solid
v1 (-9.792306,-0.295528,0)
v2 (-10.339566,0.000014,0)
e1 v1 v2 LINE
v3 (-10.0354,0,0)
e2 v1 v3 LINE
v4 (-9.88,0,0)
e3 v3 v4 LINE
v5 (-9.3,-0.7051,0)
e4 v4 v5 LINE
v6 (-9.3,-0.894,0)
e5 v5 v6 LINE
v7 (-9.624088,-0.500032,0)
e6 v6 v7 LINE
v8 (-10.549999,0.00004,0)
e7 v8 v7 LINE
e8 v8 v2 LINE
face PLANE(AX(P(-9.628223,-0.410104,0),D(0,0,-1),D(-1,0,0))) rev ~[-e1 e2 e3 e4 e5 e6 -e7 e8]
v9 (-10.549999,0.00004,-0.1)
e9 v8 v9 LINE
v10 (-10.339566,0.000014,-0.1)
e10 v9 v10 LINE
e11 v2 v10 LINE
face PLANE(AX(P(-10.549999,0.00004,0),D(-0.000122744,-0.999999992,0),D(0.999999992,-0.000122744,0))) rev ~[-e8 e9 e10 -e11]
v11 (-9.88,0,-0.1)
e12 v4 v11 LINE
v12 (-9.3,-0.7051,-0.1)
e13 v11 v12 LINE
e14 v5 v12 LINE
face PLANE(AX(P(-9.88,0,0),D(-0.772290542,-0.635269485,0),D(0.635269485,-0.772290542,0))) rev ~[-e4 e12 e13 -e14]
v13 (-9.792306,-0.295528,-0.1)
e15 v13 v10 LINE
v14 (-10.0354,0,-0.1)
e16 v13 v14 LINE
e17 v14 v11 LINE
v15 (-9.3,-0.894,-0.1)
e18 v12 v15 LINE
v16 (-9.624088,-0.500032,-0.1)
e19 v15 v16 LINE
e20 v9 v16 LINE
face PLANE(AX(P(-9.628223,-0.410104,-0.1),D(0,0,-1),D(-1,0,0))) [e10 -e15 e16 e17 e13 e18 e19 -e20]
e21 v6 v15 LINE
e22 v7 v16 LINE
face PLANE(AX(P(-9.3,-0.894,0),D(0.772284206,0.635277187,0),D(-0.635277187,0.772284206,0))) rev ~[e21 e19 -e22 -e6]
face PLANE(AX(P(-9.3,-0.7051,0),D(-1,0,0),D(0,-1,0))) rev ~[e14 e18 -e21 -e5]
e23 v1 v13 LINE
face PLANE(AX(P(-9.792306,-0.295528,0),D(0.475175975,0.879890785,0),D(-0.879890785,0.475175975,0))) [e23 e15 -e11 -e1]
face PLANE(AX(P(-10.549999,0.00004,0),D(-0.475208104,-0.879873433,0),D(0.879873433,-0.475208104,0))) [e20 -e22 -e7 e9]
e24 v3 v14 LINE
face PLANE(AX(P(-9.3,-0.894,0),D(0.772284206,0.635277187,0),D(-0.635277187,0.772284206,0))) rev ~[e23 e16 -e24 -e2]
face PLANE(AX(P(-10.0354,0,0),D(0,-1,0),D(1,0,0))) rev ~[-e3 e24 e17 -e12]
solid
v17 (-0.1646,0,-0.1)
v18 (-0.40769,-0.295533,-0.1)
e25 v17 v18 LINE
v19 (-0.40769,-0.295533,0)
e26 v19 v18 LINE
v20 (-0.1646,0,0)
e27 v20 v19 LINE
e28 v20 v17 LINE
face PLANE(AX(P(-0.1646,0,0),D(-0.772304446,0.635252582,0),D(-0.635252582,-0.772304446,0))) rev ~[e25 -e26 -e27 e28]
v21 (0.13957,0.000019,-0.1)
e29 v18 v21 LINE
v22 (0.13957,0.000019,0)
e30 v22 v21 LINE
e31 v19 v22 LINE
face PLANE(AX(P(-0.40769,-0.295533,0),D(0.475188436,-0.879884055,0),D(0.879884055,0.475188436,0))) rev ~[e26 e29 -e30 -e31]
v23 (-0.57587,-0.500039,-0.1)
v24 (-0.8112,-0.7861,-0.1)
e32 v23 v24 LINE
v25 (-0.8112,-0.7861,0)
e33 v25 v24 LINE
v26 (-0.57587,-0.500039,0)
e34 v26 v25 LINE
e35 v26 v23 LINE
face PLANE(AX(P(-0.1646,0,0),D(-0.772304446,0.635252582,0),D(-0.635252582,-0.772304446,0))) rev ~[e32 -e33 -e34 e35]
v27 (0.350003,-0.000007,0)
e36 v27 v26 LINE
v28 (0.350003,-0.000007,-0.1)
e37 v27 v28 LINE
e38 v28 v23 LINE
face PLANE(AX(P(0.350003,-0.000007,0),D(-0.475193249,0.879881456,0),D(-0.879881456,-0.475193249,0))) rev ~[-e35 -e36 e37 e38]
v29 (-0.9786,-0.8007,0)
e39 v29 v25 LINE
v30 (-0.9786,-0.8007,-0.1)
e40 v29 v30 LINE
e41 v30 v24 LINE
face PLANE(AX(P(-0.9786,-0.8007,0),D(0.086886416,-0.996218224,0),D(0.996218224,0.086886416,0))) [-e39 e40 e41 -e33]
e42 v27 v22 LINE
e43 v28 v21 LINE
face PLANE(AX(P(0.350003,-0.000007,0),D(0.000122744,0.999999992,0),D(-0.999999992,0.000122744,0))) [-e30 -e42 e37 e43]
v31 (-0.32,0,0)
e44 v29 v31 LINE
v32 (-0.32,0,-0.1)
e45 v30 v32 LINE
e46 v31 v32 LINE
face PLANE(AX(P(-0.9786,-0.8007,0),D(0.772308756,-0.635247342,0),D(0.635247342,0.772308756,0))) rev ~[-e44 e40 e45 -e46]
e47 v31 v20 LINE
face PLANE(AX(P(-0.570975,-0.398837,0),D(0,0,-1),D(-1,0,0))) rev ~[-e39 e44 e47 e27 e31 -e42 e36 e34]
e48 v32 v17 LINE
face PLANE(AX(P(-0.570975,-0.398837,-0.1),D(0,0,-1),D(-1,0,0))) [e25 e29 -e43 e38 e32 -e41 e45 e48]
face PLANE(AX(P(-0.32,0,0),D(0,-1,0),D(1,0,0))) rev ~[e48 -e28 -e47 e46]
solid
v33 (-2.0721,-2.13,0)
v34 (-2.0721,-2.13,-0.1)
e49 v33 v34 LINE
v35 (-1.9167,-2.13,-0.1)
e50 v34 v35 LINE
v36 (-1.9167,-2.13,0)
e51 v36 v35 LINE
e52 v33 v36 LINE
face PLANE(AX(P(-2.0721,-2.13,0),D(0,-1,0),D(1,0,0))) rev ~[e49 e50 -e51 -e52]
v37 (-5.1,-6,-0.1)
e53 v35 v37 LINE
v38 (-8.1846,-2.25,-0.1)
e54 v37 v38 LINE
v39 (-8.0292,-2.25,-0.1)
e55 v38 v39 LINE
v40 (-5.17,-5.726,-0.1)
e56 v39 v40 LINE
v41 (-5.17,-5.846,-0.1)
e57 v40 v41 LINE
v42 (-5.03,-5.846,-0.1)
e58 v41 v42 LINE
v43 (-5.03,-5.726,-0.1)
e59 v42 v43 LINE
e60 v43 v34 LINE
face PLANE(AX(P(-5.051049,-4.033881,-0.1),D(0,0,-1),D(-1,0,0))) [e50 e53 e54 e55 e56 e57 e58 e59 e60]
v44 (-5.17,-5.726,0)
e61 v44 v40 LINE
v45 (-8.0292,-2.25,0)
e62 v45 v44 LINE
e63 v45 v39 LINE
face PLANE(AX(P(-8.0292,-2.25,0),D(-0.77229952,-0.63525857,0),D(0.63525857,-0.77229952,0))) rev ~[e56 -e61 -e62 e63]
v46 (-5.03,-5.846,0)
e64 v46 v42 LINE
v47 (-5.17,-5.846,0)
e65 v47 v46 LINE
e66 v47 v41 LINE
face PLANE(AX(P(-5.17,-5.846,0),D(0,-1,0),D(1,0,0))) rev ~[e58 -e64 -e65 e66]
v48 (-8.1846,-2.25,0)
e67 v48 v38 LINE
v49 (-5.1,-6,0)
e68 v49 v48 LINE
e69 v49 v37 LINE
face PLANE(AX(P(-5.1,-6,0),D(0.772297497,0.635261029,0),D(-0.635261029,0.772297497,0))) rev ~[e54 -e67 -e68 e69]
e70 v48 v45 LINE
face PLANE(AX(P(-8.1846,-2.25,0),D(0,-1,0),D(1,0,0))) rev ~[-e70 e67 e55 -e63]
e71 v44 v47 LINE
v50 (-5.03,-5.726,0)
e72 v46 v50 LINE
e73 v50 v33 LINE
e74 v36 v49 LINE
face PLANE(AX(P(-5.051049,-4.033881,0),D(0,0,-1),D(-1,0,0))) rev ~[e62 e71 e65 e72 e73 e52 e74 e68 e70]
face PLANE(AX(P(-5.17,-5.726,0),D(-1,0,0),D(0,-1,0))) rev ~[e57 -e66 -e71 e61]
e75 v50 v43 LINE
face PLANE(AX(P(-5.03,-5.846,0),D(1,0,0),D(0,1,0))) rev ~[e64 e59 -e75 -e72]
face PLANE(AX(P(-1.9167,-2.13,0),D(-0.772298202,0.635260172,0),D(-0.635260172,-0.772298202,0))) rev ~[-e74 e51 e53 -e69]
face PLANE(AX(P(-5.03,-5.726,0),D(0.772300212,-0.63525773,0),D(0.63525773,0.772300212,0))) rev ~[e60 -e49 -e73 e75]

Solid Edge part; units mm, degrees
sketch "Sketch1" plane through (0, 0, 0) normal (0, 0, 1) x (1, 0, 0)
  line L0 (-9.3, -0.894) -> (-10.0354, 0)
  line L1 (-10.0354, 0) -> (-9.88, 0)
  line L2 (-9.88, 0) -> (-9.3, -0.7051)
  line L3 (-9.3, -0.7051) -> (-9.3, -0.894)
  line L4 (-0.32, 0) -> (-0.1646, 0)
  line L5 (-0.1646, 0) -> (-0.8112, -0.7861)
  line L6 (-0.9786, -0.8007) -> (-0.8112, -0.7861)
  line L7 (-0.9786, -0.8007) -> (-0.32, 0)
  line L8 (-1.9167, -2.13) -> (-5.1, -6)
  line L9 (-5.1, -6) -> (-8.1846, -2.25)
  line L10 (-8.1846, -2.25) -> (-8.0292, -2.25)
  line L11 (-8.0292, -2.25) -> (-5.17, -5.726)
  line L12 (-5.17, -5.726) -> (-5.17, -5.846)
  line L13 (-5.17, -5.846) -> (-5.03, -5.846)
  line L14 (-5.03, -5.846) -> (-5.03, -5.726)
  line L15 (-5.03, -5.726) -> (-2.0721, -2.13)
  line L16 (-2.0721, -2.13) -> (-1.9167, -2.13)
  dimension "D1" = 0.14
  dimension "D2" = 0.12
  dimension "D3" = 6
  dimension "D4" = 0.12
extrude "Protrusion1" add sketch "Sketch1" against normal blind 0.1
sketch "Sketch2" plane through (-5.1, -3, 0) normal (0, 0, 1) x (-0.6352626, 0.7722962, 0)
  line L0 (-0.8922, -5.3419) -> (-0.9433, -5.0821)
  line L1 (-1.1453, -6.1148) -> (-0.9433, -5.0821)
  line L2 (-1.1453, -6.1148) -> (-1.0116, -5.9523)
  line L3 (-0.8922, -5.3419) -> (-1.0116, -5.9523)
  line L4 (4.8047, 1.9058) -> (5.0695, 1.9058)
  line L5 (5.0695, 1.9058) -> (5.6454, 2.1407)
  line L6 (5.7791, 2.3032) -> (5.6454, 2.1407)
  line L7 (5.7791, 2.3032) -> (4.8047, 1.9058)
  dimension "D1" = 5.7791
extrude "Protrusion2" add sketch "Sketch2" against normal up to surface (0.1 mm away)
